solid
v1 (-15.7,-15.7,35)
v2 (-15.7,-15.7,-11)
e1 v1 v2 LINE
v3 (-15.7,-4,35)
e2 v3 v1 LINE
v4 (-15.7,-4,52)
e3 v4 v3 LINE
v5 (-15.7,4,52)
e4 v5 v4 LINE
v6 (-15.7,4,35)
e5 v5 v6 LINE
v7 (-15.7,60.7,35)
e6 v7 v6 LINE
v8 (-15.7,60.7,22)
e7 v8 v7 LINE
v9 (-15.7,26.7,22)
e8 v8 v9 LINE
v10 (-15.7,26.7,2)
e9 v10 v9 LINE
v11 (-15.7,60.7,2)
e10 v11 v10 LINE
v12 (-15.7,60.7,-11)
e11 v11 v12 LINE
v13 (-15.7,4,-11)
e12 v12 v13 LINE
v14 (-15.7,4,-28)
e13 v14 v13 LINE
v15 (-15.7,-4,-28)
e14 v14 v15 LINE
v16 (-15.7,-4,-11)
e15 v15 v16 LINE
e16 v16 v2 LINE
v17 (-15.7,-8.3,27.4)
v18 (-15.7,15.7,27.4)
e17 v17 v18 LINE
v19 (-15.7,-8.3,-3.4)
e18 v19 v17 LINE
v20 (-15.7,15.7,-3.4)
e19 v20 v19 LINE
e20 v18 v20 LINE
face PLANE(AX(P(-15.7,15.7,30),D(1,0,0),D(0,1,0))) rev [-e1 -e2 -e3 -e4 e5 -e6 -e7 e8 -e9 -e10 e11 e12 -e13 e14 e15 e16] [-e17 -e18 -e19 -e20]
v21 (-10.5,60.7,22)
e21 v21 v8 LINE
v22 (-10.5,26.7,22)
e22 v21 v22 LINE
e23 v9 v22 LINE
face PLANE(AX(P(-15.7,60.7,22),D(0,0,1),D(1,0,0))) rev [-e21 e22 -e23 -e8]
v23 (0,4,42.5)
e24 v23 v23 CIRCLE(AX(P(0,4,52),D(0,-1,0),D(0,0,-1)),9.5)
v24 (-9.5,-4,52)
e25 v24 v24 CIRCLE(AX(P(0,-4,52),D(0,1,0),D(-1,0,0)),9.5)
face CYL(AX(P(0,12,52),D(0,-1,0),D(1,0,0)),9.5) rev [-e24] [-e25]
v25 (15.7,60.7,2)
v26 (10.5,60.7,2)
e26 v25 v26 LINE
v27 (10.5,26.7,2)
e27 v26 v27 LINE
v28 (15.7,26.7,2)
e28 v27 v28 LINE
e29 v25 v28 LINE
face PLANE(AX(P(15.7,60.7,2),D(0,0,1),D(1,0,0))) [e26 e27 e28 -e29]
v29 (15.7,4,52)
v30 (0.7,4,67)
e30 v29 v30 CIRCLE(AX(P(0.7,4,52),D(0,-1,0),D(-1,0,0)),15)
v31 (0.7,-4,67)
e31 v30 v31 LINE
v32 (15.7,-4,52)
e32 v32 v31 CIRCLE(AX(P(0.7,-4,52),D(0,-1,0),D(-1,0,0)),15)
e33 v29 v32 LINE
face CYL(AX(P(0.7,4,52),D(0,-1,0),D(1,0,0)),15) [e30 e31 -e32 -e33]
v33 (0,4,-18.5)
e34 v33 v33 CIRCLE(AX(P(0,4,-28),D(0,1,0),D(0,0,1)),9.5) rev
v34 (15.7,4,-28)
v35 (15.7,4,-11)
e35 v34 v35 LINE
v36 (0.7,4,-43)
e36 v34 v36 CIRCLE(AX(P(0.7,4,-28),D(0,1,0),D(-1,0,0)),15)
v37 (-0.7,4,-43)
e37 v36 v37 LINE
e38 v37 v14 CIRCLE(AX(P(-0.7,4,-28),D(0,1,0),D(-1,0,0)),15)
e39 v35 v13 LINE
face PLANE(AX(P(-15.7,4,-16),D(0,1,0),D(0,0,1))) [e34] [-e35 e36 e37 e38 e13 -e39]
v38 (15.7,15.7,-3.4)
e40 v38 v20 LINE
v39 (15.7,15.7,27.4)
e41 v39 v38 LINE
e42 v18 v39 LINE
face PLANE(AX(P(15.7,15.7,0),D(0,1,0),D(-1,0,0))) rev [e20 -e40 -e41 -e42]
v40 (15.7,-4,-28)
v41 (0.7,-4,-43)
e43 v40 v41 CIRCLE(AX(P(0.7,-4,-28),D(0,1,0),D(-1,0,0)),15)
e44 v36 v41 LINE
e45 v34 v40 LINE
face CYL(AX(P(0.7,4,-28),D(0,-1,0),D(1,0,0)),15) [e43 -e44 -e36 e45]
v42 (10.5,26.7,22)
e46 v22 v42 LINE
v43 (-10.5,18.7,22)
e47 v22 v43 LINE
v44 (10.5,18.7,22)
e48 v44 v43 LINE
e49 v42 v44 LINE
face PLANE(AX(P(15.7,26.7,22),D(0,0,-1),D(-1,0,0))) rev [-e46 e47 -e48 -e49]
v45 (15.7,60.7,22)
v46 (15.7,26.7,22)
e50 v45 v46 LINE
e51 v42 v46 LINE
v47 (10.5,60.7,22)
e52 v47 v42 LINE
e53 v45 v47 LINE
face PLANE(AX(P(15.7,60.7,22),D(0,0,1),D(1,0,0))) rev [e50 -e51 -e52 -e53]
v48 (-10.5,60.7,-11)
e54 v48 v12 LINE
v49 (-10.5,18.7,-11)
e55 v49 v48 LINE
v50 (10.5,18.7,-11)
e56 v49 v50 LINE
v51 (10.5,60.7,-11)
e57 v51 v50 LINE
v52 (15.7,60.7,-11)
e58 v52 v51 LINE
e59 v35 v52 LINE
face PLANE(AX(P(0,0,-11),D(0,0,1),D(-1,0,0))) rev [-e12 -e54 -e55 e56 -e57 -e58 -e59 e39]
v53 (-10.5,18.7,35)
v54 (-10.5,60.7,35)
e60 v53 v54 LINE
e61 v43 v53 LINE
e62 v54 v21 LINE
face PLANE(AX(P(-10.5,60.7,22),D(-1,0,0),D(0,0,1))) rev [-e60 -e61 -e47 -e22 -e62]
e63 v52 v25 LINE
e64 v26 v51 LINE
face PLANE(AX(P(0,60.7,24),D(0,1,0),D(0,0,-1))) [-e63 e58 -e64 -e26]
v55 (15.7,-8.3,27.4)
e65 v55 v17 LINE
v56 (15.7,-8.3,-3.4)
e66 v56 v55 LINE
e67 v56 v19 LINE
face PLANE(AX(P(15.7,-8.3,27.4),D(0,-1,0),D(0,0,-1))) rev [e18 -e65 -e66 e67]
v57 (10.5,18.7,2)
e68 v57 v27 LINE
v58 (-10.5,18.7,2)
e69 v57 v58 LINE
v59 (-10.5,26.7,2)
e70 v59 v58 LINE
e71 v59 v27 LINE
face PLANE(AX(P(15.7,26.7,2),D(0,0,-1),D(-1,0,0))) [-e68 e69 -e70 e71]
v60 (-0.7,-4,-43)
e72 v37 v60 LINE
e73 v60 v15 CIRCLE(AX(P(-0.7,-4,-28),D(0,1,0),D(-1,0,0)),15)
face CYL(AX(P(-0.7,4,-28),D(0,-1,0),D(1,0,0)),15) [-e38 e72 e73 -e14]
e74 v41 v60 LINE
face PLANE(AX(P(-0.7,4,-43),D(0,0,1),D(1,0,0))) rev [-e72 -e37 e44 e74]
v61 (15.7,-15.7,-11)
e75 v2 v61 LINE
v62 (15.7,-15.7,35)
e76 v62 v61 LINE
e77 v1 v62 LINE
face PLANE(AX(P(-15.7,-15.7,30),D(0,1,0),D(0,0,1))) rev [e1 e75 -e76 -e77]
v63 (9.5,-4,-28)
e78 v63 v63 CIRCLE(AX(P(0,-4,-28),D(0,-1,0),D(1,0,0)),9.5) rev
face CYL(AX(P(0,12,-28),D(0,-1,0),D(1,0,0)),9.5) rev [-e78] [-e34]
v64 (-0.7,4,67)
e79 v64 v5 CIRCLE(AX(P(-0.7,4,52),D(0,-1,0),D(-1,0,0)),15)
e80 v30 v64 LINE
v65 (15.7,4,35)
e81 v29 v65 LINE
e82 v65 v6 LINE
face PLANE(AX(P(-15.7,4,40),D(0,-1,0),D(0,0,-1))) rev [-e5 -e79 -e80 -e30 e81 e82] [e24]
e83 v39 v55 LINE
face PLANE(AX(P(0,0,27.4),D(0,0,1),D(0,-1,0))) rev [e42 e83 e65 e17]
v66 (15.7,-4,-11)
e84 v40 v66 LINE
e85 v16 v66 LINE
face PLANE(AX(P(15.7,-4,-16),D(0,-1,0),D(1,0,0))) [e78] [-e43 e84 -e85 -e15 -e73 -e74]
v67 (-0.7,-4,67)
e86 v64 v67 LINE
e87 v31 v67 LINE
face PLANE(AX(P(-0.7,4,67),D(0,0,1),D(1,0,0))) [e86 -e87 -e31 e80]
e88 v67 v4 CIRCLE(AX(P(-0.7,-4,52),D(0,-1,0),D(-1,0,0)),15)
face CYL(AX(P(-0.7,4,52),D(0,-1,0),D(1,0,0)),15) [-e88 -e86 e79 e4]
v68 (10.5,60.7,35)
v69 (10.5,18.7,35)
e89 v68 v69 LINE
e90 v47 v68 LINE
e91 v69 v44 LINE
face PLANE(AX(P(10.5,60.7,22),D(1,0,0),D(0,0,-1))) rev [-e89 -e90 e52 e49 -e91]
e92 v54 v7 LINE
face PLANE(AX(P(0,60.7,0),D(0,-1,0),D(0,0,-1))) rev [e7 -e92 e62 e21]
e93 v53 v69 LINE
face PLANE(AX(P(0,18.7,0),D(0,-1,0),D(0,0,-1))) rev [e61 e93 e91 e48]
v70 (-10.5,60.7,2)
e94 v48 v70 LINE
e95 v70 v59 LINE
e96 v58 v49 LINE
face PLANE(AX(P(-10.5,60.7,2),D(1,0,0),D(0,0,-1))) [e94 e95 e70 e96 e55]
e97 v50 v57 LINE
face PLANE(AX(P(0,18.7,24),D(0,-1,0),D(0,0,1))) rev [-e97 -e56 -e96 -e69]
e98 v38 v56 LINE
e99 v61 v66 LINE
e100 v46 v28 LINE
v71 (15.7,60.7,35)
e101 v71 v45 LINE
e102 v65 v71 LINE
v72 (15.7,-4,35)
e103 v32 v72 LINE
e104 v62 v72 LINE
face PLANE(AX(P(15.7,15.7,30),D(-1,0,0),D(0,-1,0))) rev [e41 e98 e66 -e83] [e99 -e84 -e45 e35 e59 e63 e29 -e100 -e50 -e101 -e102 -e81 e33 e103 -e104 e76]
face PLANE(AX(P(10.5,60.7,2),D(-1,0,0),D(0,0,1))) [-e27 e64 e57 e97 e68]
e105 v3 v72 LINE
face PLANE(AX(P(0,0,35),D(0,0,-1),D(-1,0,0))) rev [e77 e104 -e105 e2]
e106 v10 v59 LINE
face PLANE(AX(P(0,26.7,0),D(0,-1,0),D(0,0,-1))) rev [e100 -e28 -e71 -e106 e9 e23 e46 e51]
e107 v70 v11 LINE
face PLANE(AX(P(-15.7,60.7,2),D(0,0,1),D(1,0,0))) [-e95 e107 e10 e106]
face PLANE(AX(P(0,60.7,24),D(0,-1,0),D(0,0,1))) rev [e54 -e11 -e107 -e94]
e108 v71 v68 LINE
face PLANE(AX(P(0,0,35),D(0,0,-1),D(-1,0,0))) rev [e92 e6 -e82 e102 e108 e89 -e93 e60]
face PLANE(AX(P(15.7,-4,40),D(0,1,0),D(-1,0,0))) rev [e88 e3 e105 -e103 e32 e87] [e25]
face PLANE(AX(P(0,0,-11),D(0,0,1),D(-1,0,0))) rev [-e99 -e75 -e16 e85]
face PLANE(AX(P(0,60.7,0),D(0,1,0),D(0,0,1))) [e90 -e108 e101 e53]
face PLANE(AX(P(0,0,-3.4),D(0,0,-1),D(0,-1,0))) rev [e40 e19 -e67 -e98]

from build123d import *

# Parameters (mm, degrees)
SKETCH4_W             = 31.4
SKETCH4_H             = 31.4
SKETCH4_W_2           = 25.4
SKETCH4_H_2           = 25.4
BOSS_EXTRUDE3_DEPTH   = 30
SKETCH5_W             = 31.4
SKETCH5_H             = 31.4
BOSS_EXTRUDE4_DEPTH   = 5
SKETCH6_W             = 31.4
SKETCH6_H             = 8
BOSS_EXTRUDE5_DEPTH   = 5
BOSS_EXTRUDE6_DEPTH   = 8
SKETCH8_R             = 9.5
BOSS_EXTRUDE7_DEPTH   = 8
SKETCH9_W             = 31.4
SKETCH9_H             = 10
BOSS_EXTRUDE8_DEPTH   = 5
SKETCH10_W            = 31.4
SKETCH10_H            = 10
BOSS_EXTRUDE9_DEPTH   = 11
SKETCH11_W            = 5.2
SKETCH11_H            = 10
BOSS_EXTRUDE10_DEPTH  = 40
BOSS_EXTRUDE11_DEPTH  = 3
SKETCH13_W            = 31.4
SKETCH13_H            = 31.4
CUT_EXTRUDE1_DEPTH    = 31.4
SKETCH14_W            = 31.4
SKETCH14_H            = 31.4
BOSS_EXTRUDE12_DEPTH  = 4
SKETCH16_W            = 31.4
SKETCH16_H            = 8
BOSS_EXTRUDE13_DEPTH  = 15.4
CUT_EXTRUDE3_START    = 8
SKETCH8_2_R           = 9.5
CUT_EXTRUDE3_DEPTH    = 24
SKETCH18_W            = 21
SKETCH18_H            = 13
CUT_EXTRUDE4_DEPTH    = 2
MIRROR2_START         = -15.7
MIRROR2_DEPTH         = 34.4
MIRROR2_START_2       = 12.7
MIRROR2_2_OUTLINE_W   = 5.2
MIRROR2_2_OUTLINE_H   = 13
MIRROR2_2_DEPTH       = 48
MIRROR2_START_3       = -4
MIRROR2_3_OUTLINE_R   = 9.5
MIRROR2_3_DEPTH       = 8
MIRROR2_4_OUTLINE_W   = 31.4
MIRROR2_4_OUTLINE_H   = 10
MIRROR2_4_DEPTH       = 14
MIRROR2_5_OUTLINE_W   = 25.4
MIRROR2_5_OUTLINE_H   = 15.4
MIRROR2_5_DEPTH       = 8
MIRROR2_6_OUTLINE_W   = 21
MIRROR2_6_OUTLINE_H   = 5.4
MIRROR2_6_OUTLINE_W_2 = 25.4
MIRROR2_6_OUTLINE_H_2 = 12
MIRROR2_6_DEPTH       = 6
SKETCH17_W            = 30.8
SKETCH17_H            = 24
CUT_EXTRUDE2_DEPTH    = 31.4


# Read off the part's stored shape, not the designer's step: Mirror2
with BuildPart() as part:
    # Sketch4 → Boss-Extrude3 (new body)
    with BuildSketch(Plane.XY):
        Rectangle(SKETCH4_W, SKETCH4_H)
        Rectangle(SKETCH4_W_2, SKETCH4_H_2, mode=Mode.SUBTRACT)
    extrude(amount=BOSS_EXTRUDE3_DEPTH)

    # Sketch5 → Boss-Extrude4 (add)
    with BuildSketch(Plane.XY.offset(30)):
        Rectangle(SKETCH5_W, SKETCH5_H)
    extrude(amount=BOSS_EXTRUDE4_DEPTH)

    # Sketch6 → Boss-Extrude5 (add)
    with BuildSketch(Plane.XY.offset(35)):
        Rectangle(SKETCH6_W, SKETCH6_H)
    extrude(amount=BOSS_EXTRUDE5_DEPTH)

    # Sketch7 → Boss-Extrude6 (add)
    with BuildSketch(Plane.XZ.offset(4)):
        with BuildLine():
            Line((-15.7, 40), (-15.7, 52))
            ThreePointArc((-15.7, 52), (-11.306601718, 62.606601718), (-0.7, 67))
            Line((-0.7, 67), (0.7, 67))
            ThreePointArc((0.7, 67), (11.306601718, 62.606601718), (15.7, 52))
            Line((15.7, 52), (15.7, 40))
            Line((15.7, 40), (-15.7, 40))
        make_face()
    extrude(amount=-BOSS_EXTRUDE6_DEPTH)

    # Sketch8 → Boss-Extrude7 (add)
    with BuildSketch(Plane.XZ.offset(4)):
        with Locations(Location((0, 52, 0), (0, 0, 180))):
            Circle(SKETCH8_R)
    boss_extrude7 = extrude(amount=BOSS_EXTRUDE7_DEPTH)

    # Mirror1: Boss-Extrude7 across plane
    add(boss_extrude7.mirror(Plane.ZX))

    # Sketch9 → Boss-Extrude8 (add)
    with BuildSketch(Plane(origin=(0, 15.7, 0), x_dir=(1, 0, 0), z_dir=(0, 1, 0))):
        with Locations((0, -27)):
            Rectangle(SKETCH9_W, SKETCH9_H)
    extrude(amount=BOSS_EXTRUDE8_DEPTH)

    # Sketch10 → Boss-Extrude9 (add)
    with BuildSketch(Plane(origin=(0, 15.7, 0), x_dir=(1, 0, 0), z_dir=(0, 1, 0))):
        with Locations((0, -17)):
            Rectangle(SKETCH10_W, SKETCH10_H)
    extrude(amount=BOSS_EXTRUDE9_DEPTH)

    # Sketch11 → Boss-Extrude10 (add)
    with BuildSketch(Plane(origin=(0, 20.7, 0), x_dir=(1, 0, 0), z_dir=(0, 1, 0))):
        with Locations((-13.1, -27)):
            Rectangle(SKETCH11_W, SKETCH11_H)
        with Locations((13.1, -27)):
            Rectangle(SKETCH11_W, SKETCH11_H)
    extrude(amount=BOSS_EXTRUDE10_DEPTH)

    # Sketch12 → Boss-Extrude11 (add)
    with BuildSketch(Plane.XY.offset(32)):
        Polygon((-15.7, 60.7), (-10.5, 60.7), (-10.5, 20.7), (10.5, 20.7), (10.5, 60.7), (15.7, 60.7), (15.7, 15.7), (-15.7, 15.7), align=None)
    extrude(amount=BOSS_EXTRUDE11_DEPTH)

    # Sketch13 → Cut-Extrude1 (cut)
    with BuildSketch(Plane.ZY.offset(15.7)):
        with Locations((15.7, 0)):
            Rectangle(SKETCH13_W, SKETCH13_H)
    extrude(amount=-CUT_EXTRUDE1_DEPTH, mode=Mode.SUBTRACT)

    # Sketch14 → Boss-Extrude12 (add)
    with BuildSketch(Plane(origin=(0, 0, 31.4), x_dir=(-1, 0, 0), z_dir=(0, 0, -1))):
        Rectangle(SKETCH14_W, SKETCH14_H)
    extrude(amount=BOSS_EXTRUDE12_DEPTH)

    # Sketch16 → Boss-Extrude13 (add)
    with BuildSketch(Plane(origin=(0, 0, 27.4), x_dir=(-1, 0, 0), z_dir=(0, 0, -1))):
        with Locations((0, -11.7)):
            Rectangle(SKETCH16_W, SKETCH16_H)
    extrude(amount=BOSS_EXTRUDE13_DEPTH)

    # Sketch8<2> → Cut-Extrude3 (cut)
    with BuildSketch(Plane.XZ.offset(4).offset(CUT_EXTRUDE3_START)):
        with Locations(Location((0, 52, 0), (0, 0, 270))):
            Circle(SKETCH8_2_R)
    extrude(amount=-CUT_EXTRUDE3_DEPTH, mode=Mode.SUBTRACT)

    # Sketch18 → Cut-Extrude4 (cut)
    with BuildSketch(Plane(origin=(0, 20.7, 0), x_dir=(1, 0, 0), z_dir=(0, 1, 0))):
        with Locations((0, -28.5)):
            Rectangle(SKETCH18_W, SKETCH18_H)
    extrude(amount=-CUT_EXTRUDE4_DEPTH, mode=Mode.SUBTRACT)

    # Mirror2 outline → Mirror2 (add)
    with BuildSketch(Plane(origin=(0, 0, 0), x_dir=(1, 0, 0), z_dir=(0, 1, 0)).offset(MIRROR2_START)):
        Polygon((-15.7, 11), (-15.7, -24), (-12.7, -24), (-12.7, 3.4), (12.7, 3.4), (12.7, -24), (15.7, -24), (15.7, 11), align=None)
    extrude(amount=MIRROR2_DEPTH)

    # Mirror2 2 outline → Mirror2 2 (add)
    with BuildSketch(Plane(origin=(0, 0, 0), x_dir=(1, 0, 0), z_dir=(0, 1, 0)).offset(MIRROR2_START_2)):
        with Locations((-13.1, 4.5)):
            Rectangle(MIRROR2_2_OUTLINE_W, MIRROR2_2_OUTLINE_H)
        with Locations((13.1, 4.5)):
            Rectangle(MIRROR2_2_OUTLINE_W, MIRROR2_2_OUTLINE_H)
    extrude(amount=MIRROR2_2_DEPTH)

    # Mirror2 3 outline → Mirror2 3 (add)
    with BuildSketch(Plane(origin=(0, 0, 0), x_dir=(1, 0, 0), z_dir=(0, 1, 0)).offset(MIRROR2_START_3)):
        with BuildLine():
            Line((-15.7, 28), (-15.7, 11))
            Line((-15.7, 11), (15.7, 11))
            Line((15.7, 11), (15.7, 28))
            ThreePointArc((15.7, 28), (11.306601718, 38.606601718), (0.7, 43))
            Line((0.7, 43), (-0.7, 43))
            ThreePointArc((-0.7, 43), (-11.306601718, 38.606601718), (-15.7, 28))
        make_face()
        with Locations((0, 28)):
            Circle(MIRROR2_3_OUTLINE_R, mode=Mode.SUBTRACT)
    extrude(amount=MIRROR2_3_DEPTH)

    # Mirror2 4 outline → Mirror2 4 (add)
    with BuildSketch(Plane(origin=(0, 0, 0), x_dir=(1, 0, 0), z_dir=(0, 1, 0)).offset(MIRROR2_START_2)):
        with Locations((0, -7)):
            Rectangle(MIRROR2_4_OUTLINE_W, MIRROR2_4_OUTLINE_H)
    extrude(amount=MIRROR2_4_DEPTH)

    # Mirror2 5 outline → Mirror2 5 (add)
    with BuildSketch(Plane(origin=(0, 0, 0), x_dir=(1, 0, 0), z_dir=(0, 1, 0)).offset(MIRROR2_START)):
        with Locations((0, -4.3)):
            Rectangle(MIRROR2_5_OUTLINE_W, MIRROR2_5_OUTLINE_H)
    extrude(amount=MIRROR2_5_DEPTH)

    # Mirror2 6 outline → Mirror2 6 (add)
    with BuildSketch(Plane(origin=(0, 0, 0), x_dir=(1, 0, 0), z_dir=(0, 1, 0)).offset(MIRROR2_START_2)):
        with Locations((0, 0.7)):
            Rectangle(MIRROR2_6_OUTLINE_W, MIRROR2_6_OUTLINE_H)
        with Locations((0, -18)):
            Rectangle(MIRROR2_6_OUTLINE_W_2, MIRROR2_6_OUTLINE_H_2)
    extrude(amount=MIRROR2_6_DEPTH)

    # Sketch17 → Cut-Extrude2 (cut)
    with BuildSketch(Plane.ZY.offset(15.7)):
        with Locations((12, 3.7)):
            Rectangle(SKETCH17_W, SKETCH17_H)
    extrude(amount=-CUT_EXTRUDE2_DEPTH, mode=Mode.SUBTRACT)


solid = part.part
